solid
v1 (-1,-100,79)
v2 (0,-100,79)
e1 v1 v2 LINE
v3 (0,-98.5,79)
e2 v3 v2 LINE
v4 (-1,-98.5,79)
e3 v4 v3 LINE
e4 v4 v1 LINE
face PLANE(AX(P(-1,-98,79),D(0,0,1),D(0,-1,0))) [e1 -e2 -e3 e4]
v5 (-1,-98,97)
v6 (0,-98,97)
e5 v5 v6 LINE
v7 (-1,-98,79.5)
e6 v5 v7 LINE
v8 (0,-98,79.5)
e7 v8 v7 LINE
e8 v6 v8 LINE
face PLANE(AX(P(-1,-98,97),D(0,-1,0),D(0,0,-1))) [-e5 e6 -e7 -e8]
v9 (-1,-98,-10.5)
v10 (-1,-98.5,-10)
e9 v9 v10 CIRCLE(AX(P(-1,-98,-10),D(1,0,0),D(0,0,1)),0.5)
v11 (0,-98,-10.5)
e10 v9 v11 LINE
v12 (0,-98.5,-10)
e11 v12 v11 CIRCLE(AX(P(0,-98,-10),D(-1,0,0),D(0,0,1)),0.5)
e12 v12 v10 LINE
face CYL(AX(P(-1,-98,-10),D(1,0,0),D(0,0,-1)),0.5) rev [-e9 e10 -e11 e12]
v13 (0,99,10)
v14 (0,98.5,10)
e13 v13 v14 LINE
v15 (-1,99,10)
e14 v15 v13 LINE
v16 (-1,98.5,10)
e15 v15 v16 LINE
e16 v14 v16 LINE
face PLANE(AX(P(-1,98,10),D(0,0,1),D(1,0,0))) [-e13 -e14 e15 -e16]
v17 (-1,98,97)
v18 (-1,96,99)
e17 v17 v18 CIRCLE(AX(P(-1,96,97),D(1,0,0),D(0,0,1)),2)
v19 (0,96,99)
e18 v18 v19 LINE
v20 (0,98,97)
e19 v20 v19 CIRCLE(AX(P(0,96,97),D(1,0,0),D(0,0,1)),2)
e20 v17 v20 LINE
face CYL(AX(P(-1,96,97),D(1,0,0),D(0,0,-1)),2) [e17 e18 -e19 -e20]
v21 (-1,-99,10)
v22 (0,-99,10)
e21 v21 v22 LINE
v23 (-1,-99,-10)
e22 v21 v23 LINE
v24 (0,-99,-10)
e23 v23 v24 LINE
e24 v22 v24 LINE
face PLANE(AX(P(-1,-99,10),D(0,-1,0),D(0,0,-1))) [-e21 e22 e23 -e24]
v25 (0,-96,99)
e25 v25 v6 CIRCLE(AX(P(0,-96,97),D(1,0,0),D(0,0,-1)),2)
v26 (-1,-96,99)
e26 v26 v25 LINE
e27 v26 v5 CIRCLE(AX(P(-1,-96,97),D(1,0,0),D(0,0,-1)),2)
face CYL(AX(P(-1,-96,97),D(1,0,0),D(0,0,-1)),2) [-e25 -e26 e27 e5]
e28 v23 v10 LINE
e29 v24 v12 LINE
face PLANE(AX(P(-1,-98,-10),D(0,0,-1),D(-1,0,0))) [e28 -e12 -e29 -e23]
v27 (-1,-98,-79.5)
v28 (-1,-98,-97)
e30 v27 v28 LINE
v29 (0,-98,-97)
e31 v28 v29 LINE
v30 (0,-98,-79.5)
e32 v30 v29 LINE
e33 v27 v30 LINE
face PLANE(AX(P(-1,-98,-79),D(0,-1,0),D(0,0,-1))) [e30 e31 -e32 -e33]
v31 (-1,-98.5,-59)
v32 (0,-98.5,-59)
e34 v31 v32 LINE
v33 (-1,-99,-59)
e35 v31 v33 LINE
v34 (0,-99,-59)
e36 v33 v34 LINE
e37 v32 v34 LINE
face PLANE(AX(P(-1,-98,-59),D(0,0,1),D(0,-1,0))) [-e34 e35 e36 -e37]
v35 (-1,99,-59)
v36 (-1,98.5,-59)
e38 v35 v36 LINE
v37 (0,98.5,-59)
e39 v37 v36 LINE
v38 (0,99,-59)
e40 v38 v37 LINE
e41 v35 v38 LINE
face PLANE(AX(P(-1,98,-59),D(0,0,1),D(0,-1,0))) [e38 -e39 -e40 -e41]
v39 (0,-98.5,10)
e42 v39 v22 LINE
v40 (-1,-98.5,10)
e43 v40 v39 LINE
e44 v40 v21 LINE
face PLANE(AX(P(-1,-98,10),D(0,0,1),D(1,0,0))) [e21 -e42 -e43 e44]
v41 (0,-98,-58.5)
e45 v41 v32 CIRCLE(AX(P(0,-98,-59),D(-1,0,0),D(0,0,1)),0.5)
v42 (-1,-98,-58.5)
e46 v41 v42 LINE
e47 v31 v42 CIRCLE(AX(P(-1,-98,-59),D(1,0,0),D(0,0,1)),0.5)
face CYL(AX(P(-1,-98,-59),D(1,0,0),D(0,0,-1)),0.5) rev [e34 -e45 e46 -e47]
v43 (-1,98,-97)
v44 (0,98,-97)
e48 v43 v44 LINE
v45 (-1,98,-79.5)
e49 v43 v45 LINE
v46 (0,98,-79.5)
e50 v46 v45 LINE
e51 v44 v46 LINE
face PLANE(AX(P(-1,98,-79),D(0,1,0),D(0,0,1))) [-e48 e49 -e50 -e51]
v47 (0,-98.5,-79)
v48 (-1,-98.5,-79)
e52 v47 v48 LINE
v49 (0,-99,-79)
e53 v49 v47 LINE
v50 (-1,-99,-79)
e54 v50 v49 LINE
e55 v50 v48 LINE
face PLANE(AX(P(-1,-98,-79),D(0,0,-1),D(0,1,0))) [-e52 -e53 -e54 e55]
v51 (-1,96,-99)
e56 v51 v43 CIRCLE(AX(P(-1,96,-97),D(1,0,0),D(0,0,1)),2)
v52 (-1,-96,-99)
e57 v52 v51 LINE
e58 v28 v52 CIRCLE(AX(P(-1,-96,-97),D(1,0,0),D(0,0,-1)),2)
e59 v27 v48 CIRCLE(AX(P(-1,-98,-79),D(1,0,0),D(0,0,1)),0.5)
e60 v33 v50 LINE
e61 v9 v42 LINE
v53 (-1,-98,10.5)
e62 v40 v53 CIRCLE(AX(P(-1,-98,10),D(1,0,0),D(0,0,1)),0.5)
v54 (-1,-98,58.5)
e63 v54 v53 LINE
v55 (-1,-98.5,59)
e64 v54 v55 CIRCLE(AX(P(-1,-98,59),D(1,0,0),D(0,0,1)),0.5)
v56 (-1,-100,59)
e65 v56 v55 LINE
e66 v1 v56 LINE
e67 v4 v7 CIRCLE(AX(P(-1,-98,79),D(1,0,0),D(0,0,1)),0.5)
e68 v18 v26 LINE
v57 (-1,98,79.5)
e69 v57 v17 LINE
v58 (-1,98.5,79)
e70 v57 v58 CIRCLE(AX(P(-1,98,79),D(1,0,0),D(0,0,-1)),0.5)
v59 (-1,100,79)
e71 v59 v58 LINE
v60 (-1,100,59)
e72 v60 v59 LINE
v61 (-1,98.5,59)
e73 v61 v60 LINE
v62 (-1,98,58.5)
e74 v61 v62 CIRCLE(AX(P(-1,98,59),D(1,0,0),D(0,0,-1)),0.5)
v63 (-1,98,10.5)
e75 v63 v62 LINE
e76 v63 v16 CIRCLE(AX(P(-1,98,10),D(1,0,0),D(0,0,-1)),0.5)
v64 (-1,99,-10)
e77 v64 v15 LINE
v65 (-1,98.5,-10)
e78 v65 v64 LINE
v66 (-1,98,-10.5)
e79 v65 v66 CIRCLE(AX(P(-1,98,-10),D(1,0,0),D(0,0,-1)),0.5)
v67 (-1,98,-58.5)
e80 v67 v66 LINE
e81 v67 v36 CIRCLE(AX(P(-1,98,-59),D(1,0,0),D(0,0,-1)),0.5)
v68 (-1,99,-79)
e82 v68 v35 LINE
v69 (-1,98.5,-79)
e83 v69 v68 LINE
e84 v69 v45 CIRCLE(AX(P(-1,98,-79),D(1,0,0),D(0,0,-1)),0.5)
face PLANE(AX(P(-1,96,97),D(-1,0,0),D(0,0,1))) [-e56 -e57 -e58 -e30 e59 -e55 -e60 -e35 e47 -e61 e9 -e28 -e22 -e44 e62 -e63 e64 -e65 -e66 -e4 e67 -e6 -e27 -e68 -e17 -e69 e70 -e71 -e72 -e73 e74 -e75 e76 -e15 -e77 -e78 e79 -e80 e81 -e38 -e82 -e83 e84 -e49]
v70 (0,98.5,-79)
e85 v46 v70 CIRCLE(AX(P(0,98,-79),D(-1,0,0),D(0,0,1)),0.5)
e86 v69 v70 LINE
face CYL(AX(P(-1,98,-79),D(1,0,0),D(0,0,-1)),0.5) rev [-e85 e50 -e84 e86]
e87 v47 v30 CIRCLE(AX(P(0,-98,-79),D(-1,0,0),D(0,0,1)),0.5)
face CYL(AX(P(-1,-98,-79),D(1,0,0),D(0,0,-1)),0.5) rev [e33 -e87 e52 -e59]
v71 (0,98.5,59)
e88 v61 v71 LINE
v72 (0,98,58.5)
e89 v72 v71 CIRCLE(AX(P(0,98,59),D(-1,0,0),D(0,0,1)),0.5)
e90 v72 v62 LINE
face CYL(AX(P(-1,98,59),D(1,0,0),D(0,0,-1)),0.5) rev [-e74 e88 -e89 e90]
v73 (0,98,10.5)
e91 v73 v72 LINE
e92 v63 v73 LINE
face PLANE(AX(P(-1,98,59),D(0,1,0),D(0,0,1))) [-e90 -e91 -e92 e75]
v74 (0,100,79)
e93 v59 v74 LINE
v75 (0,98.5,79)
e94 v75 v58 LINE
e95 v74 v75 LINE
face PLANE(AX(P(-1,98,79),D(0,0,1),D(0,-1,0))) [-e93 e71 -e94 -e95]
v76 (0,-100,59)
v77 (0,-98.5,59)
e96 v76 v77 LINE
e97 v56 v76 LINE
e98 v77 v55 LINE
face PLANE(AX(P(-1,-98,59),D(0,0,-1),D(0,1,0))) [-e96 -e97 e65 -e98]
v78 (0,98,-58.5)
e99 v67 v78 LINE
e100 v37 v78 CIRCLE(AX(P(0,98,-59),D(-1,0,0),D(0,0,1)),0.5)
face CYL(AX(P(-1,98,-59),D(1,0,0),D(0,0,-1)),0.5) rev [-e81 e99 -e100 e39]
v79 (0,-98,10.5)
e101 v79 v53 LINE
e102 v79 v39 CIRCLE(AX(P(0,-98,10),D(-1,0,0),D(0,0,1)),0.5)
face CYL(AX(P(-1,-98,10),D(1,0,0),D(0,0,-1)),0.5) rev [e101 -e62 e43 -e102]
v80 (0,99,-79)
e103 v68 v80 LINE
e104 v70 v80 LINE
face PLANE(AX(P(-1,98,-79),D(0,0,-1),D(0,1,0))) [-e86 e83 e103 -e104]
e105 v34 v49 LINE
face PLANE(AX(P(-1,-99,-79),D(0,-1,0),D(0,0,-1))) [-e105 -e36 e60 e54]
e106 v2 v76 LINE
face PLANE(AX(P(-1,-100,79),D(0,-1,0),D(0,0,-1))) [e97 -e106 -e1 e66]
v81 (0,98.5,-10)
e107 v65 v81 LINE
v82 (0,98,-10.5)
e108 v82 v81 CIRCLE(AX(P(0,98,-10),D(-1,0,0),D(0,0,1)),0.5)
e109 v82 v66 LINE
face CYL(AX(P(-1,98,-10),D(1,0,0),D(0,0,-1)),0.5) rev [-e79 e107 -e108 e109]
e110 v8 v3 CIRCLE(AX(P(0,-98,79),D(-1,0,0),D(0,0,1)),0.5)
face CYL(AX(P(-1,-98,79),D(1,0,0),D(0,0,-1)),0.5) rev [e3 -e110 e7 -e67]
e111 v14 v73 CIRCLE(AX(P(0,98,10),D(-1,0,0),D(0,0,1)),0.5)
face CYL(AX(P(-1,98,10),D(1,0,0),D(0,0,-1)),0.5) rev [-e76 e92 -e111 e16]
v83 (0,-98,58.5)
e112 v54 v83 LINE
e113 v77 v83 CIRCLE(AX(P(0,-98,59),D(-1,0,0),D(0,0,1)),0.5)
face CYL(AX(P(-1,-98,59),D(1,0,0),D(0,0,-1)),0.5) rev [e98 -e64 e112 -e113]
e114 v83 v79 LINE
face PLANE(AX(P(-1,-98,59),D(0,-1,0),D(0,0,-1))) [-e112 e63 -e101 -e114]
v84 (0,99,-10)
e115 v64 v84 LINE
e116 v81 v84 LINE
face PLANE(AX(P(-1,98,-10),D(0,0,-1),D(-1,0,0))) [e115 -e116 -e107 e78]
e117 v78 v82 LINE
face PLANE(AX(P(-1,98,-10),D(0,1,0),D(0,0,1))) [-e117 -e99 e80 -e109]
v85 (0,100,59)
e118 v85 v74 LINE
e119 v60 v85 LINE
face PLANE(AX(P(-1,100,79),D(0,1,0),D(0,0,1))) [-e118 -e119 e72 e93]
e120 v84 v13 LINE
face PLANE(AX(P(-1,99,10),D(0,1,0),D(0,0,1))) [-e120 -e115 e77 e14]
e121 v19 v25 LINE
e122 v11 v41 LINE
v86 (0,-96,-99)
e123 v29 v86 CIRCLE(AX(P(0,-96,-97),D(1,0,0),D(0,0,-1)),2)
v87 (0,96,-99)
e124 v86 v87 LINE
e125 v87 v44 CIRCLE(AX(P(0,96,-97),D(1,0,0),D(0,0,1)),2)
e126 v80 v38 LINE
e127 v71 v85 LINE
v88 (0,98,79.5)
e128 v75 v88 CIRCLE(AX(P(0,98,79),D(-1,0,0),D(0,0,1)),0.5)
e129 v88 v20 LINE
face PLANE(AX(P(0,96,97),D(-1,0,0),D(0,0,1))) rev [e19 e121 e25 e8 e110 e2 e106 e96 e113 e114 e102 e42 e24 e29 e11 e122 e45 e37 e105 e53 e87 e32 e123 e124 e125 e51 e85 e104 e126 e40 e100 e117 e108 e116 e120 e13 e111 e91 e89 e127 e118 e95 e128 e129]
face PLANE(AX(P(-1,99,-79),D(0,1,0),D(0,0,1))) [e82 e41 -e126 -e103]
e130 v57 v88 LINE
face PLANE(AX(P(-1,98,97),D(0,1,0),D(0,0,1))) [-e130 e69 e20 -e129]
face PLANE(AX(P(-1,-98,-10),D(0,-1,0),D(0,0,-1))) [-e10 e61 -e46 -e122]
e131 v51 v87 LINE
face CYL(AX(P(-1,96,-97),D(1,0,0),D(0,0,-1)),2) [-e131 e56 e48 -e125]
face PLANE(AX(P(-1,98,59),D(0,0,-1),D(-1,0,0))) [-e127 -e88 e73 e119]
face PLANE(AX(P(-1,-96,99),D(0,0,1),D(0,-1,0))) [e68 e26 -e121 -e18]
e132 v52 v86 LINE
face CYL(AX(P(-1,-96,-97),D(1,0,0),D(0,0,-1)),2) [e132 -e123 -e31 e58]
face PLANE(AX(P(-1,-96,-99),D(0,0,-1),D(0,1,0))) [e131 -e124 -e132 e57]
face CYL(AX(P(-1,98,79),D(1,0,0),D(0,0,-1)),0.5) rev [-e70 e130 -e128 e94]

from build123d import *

# Parameters (mm, degrees)
T_LE_DE_BASE_PLI_E1_DEPTH = 1
ESQUISSE3_R               = 0.5
ENL_V_MAT_EXTRU_1_DEPTH   = 141.719579306


# Sheet-metal steps are written as plain solids
with BuildPart() as part:
    # Esquisse1 → Tôle de base pliée1 (new body)
    with BuildSketch(Plane(origin=(0, 0, 0), x_dir=(0, 0, -1), z_dir=(1, 0, 0))):
        with BuildLine():
            Line((-99, -96), (-99, 96))
            ThreePointArc((-99, 96), (-98.414213562, 97.414213562), (-97, 98))
            Line((-97, 98), (-79, 98))
            Line((-79, 98), (-79, 100))
            Line((-79, 100), (-59, 100))
            Line((-59, 100), (-59, 98))
            Line((-59, 98), (-10, 98))
            Line((-10, 98), (-10, 99))
            Line((-10, 99), (10, 99))
            Line((10, 99), (10, 98))
            Line((10, 98), (59, 98))
            Line((59, 98), (59, 99))
            Line((59, 99), (79, 99))
            Line((79, 99), (79, 98))
            Line((79, 98), (97, 98))
            ThreePointArc((97, 98), (98.414213562, 97.414213562), (99, 96))
            Line((99, 96), (99, -96))
            ThreePointArc((99, -96), (98.414213562, -97.414213562), (97, -98))
            Line((97, -98), (79, -98))
            Line((79, -98), (79, -99))
            Line((79, -99), (59, -99))
            Line((59, -99), (59, -98))
            Line((59, -98), (10, -98))
            Line((10, -98), (10, -99))
            Line((10, -99), (-10, -99))
            Line((-10, -99), (-10, -98))
            Line((-10, -98), (-59, -98))
            Line((-59, -98), (-59, -100))
            Line((-59, -100), (-79, -100))
            Line((-79, -100), (-79, -98))
            Line((-79, -98), (-97, -98))
            ThreePointArc((-97, -98), (-98.414213562, -97.414213562), (-99, -96))
        make_face()
    extrude(amount=-T_LE_DE_BASE_PLI_E1_DEPTH)

    # Esquisse3 → Enlèv. mat.-Extru.1 (cut, through all)
    with BuildSketch(Plane(origin=(0, 0, 0), x_dir=(0, 0, -1), z_dir=(1, 0, 0))):
        with Locations((-79, 98)):
            Circle(ESQUISSE3_R)
        with Locations((-59, 98)):
            Circle(ESQUISSE3_R)
        with Locations((-10, 98)):
            Circle(ESQUISSE3_R)
        with Locations((10, 98)):
            Circle(ESQUISSE3_R)
        with Locations((59, 98)):
            Circle(ESQUISSE3_R)
        with Locations((79, 98)):
            Circle(ESQUISSE3_R)
        with Locations((79, -98)):
            Circle(ESQUISSE3_R)
        with Locations((59, -98)):
            Circle(ESQUISSE3_R)
        with Locations((10, -98)):
            Circle(ESQUISSE3_R)
        with Locations((-10, -98)):
            Circle(ESQUISSE3_R)
        with Locations((-59, -98)):
            Circle(ESQUISSE3_R)
        with Locations((-79, -98)):
            Circle(ESQUISSE3_R)
    extrude(amount=-ENL_V_MAT_EXTRU_1_DEPTH, mode=Mode.SUBTRACT)


solid = part.part
